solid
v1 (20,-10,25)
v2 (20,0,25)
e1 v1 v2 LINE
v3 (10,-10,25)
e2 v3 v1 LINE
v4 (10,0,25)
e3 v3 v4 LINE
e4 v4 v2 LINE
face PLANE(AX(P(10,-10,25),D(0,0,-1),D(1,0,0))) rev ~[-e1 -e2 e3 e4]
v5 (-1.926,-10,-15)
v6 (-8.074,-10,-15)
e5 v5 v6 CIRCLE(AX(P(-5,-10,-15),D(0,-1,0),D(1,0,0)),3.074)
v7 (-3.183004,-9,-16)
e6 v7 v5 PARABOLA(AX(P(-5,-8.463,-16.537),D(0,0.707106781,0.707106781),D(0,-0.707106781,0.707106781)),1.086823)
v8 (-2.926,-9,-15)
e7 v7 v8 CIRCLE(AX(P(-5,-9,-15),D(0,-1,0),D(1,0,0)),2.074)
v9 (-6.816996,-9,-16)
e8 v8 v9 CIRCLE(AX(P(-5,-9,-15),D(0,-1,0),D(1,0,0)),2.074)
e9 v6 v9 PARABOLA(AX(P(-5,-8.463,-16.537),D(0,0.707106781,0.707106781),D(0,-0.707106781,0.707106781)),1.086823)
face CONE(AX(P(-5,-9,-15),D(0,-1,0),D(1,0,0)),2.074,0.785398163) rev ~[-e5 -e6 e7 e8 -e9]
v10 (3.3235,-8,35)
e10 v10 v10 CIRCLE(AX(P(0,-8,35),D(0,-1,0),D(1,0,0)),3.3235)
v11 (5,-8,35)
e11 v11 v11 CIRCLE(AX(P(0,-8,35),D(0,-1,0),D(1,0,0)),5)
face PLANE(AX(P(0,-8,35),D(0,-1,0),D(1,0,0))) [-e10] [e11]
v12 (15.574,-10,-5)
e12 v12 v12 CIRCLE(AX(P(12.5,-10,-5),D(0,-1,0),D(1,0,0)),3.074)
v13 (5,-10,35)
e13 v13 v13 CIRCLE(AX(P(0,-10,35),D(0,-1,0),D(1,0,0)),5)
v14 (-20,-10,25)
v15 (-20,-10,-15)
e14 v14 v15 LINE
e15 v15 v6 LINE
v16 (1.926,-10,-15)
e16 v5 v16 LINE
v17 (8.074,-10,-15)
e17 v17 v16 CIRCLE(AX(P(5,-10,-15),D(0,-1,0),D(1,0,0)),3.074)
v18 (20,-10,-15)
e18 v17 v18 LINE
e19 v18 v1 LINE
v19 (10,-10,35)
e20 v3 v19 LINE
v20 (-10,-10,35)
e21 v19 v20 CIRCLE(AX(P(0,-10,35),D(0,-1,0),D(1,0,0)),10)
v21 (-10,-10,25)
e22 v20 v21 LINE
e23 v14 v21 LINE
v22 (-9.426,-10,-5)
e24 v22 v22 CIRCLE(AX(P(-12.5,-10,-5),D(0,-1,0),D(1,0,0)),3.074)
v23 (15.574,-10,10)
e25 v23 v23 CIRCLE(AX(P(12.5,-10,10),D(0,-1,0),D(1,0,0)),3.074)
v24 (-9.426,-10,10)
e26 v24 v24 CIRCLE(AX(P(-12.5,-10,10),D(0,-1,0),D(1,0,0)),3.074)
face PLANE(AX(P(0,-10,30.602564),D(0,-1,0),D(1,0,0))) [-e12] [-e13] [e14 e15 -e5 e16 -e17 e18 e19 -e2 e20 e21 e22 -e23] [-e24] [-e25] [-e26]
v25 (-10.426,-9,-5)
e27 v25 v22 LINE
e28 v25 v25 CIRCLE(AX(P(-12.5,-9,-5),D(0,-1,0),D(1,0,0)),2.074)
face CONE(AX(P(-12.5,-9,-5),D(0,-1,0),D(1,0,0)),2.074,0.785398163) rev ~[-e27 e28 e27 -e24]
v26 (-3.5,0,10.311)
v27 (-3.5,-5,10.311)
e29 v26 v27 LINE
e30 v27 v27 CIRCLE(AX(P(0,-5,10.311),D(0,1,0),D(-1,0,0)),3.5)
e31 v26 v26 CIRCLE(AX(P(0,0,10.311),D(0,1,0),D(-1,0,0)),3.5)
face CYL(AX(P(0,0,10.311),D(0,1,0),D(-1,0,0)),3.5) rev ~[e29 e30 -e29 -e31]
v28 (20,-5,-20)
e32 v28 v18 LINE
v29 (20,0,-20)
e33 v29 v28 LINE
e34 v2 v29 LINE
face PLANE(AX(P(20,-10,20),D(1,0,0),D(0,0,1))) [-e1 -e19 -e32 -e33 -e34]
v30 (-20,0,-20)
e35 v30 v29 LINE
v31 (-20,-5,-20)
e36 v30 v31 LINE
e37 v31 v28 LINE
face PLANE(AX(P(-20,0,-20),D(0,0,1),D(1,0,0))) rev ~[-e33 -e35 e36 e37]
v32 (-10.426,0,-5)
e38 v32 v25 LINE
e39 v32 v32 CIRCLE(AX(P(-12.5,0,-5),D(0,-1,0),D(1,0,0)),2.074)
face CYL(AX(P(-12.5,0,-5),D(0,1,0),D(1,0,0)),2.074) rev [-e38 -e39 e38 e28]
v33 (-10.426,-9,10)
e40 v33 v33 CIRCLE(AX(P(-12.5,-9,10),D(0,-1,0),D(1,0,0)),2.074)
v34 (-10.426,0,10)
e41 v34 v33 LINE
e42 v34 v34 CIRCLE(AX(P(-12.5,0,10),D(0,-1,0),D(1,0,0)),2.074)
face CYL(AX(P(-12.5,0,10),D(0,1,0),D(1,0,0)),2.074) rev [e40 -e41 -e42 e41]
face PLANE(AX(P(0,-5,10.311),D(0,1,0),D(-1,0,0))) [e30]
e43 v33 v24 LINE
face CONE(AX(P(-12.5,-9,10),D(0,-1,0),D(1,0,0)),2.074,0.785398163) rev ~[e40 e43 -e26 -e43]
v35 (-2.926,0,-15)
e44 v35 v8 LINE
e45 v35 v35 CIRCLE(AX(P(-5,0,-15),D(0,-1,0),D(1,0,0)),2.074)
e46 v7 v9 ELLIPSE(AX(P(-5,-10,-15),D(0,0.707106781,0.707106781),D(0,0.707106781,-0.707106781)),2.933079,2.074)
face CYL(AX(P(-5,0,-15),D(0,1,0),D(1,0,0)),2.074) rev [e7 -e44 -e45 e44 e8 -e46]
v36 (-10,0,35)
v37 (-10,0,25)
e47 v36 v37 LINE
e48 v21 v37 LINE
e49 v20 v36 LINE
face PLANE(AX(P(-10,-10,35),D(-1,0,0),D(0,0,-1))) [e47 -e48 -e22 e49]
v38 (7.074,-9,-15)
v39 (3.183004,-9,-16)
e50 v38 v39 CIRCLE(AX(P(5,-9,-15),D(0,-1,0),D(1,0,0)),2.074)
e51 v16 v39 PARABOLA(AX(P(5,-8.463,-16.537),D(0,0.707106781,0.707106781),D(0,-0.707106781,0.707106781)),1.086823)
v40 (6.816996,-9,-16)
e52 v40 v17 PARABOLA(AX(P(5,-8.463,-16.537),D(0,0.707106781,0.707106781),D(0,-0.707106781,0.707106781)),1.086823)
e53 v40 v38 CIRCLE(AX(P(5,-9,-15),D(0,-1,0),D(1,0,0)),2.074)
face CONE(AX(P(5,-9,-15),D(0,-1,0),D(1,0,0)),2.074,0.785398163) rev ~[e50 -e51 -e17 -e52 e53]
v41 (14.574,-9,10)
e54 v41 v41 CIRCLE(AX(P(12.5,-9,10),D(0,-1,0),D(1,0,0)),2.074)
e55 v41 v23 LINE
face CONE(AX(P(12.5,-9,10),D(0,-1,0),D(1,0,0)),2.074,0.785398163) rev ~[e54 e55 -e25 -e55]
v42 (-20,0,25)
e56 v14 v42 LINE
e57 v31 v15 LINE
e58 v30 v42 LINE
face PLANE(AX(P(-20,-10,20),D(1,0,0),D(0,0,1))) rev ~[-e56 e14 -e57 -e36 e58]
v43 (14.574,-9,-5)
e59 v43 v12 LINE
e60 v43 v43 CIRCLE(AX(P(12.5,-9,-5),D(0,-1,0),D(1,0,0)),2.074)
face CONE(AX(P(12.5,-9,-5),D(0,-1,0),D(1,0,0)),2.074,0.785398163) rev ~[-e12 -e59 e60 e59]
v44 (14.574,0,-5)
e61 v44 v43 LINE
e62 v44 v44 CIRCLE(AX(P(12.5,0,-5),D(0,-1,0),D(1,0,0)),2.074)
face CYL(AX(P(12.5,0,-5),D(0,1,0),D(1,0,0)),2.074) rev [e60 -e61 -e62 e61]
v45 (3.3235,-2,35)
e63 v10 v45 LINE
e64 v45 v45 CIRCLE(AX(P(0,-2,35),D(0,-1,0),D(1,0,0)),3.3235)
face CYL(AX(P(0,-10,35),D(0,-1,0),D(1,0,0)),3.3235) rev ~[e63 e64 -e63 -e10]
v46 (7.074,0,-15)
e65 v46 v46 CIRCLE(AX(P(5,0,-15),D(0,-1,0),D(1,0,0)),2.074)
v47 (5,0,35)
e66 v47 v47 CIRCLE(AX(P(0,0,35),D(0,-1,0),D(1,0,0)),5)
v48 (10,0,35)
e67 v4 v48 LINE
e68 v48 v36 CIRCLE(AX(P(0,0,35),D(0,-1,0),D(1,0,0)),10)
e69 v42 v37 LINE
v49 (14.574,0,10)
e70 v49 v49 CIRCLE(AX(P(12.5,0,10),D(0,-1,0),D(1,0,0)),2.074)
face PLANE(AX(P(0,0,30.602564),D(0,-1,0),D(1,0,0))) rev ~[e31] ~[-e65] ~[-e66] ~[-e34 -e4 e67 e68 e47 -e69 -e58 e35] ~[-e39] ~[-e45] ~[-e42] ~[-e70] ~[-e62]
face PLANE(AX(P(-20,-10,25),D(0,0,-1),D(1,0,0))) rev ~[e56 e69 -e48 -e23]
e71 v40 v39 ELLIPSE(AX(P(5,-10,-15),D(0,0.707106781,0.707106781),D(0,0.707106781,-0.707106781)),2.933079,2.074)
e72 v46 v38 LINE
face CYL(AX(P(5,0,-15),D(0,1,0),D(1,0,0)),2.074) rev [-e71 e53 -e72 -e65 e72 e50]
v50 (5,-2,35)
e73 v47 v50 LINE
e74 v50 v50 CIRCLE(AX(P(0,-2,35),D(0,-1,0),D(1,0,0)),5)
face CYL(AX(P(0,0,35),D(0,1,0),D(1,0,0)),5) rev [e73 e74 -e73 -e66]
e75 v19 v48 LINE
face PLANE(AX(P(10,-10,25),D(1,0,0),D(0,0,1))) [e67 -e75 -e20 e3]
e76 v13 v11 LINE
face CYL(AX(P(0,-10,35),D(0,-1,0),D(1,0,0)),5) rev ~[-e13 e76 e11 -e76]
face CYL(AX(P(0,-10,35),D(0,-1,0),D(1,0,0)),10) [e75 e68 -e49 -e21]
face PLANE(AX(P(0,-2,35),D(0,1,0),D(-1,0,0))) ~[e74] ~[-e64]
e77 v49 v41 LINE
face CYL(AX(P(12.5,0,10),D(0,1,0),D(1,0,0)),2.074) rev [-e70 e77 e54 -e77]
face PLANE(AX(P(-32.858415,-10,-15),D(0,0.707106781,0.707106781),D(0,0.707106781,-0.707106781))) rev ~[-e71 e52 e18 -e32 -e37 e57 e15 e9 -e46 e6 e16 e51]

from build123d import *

# Parameters (mm, degrees)
F0_W         = 40
F0_H         = 40
F0_R         = 2.074
F1_DEPTH     = 10
F2_W         = 10
F2_H         = 5
F3_DEPTH     = 10
F4_SIZE      = 1
F5_R         = 3.3235
F6_DEPTH     = 10.001
F7_R         = 5
F7_R_2       = 3.3235
F8_DEPTH     = 2
F10_R        = 3.5
F11_DEPTH    = 5
F12_T1_DEPTH = 65.7168298797


# Not quite as in the source:
# - a fillet or chamfer that OpenCascade refuses, or shapes differently, is made with other operations: its cross-section is extruded or revolved along the edge and cut away or added
# - a pattern or mirror of a feature is missing from the dataset's text; its kind, count and spacing are read off the source's solid


with BuildPart() as f1:
    # F0 (on Front) → F1 (new body)
    with BuildSketch(Plane.XZ):
        Rectangle(F0_W, F0_H)
        with Locations((-5, -15)):
            Circle(F0_R, mode=Mode.SUBTRACT)
        with Locations((-12.5, -5)):
            Circle(F0_R, mode=Mode.SUBTRACT)
        with Locations((5, -15)):
            Circle(F0_R, mode=Mode.SUBTRACT)
        with Locations((12.5, -5)):
            Circle(F0_R, mode=Mode.SUBTRACT)
        with Locations((-12.5, 10)):
            Circle(F0_R, mode=Mode.SUBTRACT)
        with Locations((12.5, 10)):
            Circle(F0_R, mode=Mode.SUBTRACT)
    extrude(amount=F1_DEPTH)

    # F2 (on face) → F3 (join, through all)
    with BuildSketch(Plane.XZ.offset(10)):
        with BuildLine():
            Line((10, 25), (10, 35))
            ThreePointArc((10, 35), (0, 45), (-10, 35))
            Line((-10, 35), (-10, 25))
            Line((-10, 25), (-10, 20))
            Line((-10, 20), (10, 20))
            Line((10, 20), (10, 25))
        make_face()
        with Locations((-15, 22.5)):
            Rectangle(F2_W, F2_H)
        with Locations((15, 22.5)):
            Rectangle(F2_W, F2_H)
    extrude(amount=-F3_DEPTH)

    # F4
    f4_edges = [f1.edges().sort_by_distance(p)[0] for p in [
        (-7.074, -10, -15),
        (2.926, -10, -15),
        (-14.574, -10, 10),
        (-14.574, -10, -5),
        (10.426, -10, -5),
        (10.426, -10, 10),
    ]]
    chamfer(f4_edges, length=F4_SIZE)

    # F5 (on face) → F6 (cut, through all)
    with BuildSketch(Plane.XZ.offset(10)):
        with Locations((0, 35)):
            Circle(F5_R)
    extrude(amount=-F6_DEPTH, mode=Mode.SUBTRACT)

    # F7 (on face) → F8 (cut)
    with BuildSketch(Plane.XZ.offset(10)):
        with Locations((0, 35)):
            Circle(F7_R)
        with Locations((0, 35)):
            Circle(F7_R_2, mode=Mode.SUBTRACT)
    f8 = extrude(amount=-F8_DEPTH, mode=Mode.SUBTRACT)

    # F8_copies: F8 across plane
    add(f8.mirror(Plane.ZX.offset(-5)), mode=Mode.SUBTRACT)

    # F10 (on face) → F11 (cut)
    with BuildSketch(Plane(origin=(0, 0, 0), x_dir=(-1, 0, 0), z_dir=(0, 1, 0))):
        with Locations((0, 10.311)):
            Circle(F10_R)
    extrude(amount=-F11_DEPTH, mode=Mode.SUBTRACT)

    # F12: chamfer of 5 on 1 edges, made by hand

    # F12_s2 → F12_t1 (cut)
    with BuildSketch(Plane.YZ.offset(-32.8584149398)):
        Polygon((-10, -15), (-5, -20), (-10, -20), align=None)
    extrude(amount=F12_T1_DEPTH, mode=Mode.SUBTRACT)


solid = f1.part
